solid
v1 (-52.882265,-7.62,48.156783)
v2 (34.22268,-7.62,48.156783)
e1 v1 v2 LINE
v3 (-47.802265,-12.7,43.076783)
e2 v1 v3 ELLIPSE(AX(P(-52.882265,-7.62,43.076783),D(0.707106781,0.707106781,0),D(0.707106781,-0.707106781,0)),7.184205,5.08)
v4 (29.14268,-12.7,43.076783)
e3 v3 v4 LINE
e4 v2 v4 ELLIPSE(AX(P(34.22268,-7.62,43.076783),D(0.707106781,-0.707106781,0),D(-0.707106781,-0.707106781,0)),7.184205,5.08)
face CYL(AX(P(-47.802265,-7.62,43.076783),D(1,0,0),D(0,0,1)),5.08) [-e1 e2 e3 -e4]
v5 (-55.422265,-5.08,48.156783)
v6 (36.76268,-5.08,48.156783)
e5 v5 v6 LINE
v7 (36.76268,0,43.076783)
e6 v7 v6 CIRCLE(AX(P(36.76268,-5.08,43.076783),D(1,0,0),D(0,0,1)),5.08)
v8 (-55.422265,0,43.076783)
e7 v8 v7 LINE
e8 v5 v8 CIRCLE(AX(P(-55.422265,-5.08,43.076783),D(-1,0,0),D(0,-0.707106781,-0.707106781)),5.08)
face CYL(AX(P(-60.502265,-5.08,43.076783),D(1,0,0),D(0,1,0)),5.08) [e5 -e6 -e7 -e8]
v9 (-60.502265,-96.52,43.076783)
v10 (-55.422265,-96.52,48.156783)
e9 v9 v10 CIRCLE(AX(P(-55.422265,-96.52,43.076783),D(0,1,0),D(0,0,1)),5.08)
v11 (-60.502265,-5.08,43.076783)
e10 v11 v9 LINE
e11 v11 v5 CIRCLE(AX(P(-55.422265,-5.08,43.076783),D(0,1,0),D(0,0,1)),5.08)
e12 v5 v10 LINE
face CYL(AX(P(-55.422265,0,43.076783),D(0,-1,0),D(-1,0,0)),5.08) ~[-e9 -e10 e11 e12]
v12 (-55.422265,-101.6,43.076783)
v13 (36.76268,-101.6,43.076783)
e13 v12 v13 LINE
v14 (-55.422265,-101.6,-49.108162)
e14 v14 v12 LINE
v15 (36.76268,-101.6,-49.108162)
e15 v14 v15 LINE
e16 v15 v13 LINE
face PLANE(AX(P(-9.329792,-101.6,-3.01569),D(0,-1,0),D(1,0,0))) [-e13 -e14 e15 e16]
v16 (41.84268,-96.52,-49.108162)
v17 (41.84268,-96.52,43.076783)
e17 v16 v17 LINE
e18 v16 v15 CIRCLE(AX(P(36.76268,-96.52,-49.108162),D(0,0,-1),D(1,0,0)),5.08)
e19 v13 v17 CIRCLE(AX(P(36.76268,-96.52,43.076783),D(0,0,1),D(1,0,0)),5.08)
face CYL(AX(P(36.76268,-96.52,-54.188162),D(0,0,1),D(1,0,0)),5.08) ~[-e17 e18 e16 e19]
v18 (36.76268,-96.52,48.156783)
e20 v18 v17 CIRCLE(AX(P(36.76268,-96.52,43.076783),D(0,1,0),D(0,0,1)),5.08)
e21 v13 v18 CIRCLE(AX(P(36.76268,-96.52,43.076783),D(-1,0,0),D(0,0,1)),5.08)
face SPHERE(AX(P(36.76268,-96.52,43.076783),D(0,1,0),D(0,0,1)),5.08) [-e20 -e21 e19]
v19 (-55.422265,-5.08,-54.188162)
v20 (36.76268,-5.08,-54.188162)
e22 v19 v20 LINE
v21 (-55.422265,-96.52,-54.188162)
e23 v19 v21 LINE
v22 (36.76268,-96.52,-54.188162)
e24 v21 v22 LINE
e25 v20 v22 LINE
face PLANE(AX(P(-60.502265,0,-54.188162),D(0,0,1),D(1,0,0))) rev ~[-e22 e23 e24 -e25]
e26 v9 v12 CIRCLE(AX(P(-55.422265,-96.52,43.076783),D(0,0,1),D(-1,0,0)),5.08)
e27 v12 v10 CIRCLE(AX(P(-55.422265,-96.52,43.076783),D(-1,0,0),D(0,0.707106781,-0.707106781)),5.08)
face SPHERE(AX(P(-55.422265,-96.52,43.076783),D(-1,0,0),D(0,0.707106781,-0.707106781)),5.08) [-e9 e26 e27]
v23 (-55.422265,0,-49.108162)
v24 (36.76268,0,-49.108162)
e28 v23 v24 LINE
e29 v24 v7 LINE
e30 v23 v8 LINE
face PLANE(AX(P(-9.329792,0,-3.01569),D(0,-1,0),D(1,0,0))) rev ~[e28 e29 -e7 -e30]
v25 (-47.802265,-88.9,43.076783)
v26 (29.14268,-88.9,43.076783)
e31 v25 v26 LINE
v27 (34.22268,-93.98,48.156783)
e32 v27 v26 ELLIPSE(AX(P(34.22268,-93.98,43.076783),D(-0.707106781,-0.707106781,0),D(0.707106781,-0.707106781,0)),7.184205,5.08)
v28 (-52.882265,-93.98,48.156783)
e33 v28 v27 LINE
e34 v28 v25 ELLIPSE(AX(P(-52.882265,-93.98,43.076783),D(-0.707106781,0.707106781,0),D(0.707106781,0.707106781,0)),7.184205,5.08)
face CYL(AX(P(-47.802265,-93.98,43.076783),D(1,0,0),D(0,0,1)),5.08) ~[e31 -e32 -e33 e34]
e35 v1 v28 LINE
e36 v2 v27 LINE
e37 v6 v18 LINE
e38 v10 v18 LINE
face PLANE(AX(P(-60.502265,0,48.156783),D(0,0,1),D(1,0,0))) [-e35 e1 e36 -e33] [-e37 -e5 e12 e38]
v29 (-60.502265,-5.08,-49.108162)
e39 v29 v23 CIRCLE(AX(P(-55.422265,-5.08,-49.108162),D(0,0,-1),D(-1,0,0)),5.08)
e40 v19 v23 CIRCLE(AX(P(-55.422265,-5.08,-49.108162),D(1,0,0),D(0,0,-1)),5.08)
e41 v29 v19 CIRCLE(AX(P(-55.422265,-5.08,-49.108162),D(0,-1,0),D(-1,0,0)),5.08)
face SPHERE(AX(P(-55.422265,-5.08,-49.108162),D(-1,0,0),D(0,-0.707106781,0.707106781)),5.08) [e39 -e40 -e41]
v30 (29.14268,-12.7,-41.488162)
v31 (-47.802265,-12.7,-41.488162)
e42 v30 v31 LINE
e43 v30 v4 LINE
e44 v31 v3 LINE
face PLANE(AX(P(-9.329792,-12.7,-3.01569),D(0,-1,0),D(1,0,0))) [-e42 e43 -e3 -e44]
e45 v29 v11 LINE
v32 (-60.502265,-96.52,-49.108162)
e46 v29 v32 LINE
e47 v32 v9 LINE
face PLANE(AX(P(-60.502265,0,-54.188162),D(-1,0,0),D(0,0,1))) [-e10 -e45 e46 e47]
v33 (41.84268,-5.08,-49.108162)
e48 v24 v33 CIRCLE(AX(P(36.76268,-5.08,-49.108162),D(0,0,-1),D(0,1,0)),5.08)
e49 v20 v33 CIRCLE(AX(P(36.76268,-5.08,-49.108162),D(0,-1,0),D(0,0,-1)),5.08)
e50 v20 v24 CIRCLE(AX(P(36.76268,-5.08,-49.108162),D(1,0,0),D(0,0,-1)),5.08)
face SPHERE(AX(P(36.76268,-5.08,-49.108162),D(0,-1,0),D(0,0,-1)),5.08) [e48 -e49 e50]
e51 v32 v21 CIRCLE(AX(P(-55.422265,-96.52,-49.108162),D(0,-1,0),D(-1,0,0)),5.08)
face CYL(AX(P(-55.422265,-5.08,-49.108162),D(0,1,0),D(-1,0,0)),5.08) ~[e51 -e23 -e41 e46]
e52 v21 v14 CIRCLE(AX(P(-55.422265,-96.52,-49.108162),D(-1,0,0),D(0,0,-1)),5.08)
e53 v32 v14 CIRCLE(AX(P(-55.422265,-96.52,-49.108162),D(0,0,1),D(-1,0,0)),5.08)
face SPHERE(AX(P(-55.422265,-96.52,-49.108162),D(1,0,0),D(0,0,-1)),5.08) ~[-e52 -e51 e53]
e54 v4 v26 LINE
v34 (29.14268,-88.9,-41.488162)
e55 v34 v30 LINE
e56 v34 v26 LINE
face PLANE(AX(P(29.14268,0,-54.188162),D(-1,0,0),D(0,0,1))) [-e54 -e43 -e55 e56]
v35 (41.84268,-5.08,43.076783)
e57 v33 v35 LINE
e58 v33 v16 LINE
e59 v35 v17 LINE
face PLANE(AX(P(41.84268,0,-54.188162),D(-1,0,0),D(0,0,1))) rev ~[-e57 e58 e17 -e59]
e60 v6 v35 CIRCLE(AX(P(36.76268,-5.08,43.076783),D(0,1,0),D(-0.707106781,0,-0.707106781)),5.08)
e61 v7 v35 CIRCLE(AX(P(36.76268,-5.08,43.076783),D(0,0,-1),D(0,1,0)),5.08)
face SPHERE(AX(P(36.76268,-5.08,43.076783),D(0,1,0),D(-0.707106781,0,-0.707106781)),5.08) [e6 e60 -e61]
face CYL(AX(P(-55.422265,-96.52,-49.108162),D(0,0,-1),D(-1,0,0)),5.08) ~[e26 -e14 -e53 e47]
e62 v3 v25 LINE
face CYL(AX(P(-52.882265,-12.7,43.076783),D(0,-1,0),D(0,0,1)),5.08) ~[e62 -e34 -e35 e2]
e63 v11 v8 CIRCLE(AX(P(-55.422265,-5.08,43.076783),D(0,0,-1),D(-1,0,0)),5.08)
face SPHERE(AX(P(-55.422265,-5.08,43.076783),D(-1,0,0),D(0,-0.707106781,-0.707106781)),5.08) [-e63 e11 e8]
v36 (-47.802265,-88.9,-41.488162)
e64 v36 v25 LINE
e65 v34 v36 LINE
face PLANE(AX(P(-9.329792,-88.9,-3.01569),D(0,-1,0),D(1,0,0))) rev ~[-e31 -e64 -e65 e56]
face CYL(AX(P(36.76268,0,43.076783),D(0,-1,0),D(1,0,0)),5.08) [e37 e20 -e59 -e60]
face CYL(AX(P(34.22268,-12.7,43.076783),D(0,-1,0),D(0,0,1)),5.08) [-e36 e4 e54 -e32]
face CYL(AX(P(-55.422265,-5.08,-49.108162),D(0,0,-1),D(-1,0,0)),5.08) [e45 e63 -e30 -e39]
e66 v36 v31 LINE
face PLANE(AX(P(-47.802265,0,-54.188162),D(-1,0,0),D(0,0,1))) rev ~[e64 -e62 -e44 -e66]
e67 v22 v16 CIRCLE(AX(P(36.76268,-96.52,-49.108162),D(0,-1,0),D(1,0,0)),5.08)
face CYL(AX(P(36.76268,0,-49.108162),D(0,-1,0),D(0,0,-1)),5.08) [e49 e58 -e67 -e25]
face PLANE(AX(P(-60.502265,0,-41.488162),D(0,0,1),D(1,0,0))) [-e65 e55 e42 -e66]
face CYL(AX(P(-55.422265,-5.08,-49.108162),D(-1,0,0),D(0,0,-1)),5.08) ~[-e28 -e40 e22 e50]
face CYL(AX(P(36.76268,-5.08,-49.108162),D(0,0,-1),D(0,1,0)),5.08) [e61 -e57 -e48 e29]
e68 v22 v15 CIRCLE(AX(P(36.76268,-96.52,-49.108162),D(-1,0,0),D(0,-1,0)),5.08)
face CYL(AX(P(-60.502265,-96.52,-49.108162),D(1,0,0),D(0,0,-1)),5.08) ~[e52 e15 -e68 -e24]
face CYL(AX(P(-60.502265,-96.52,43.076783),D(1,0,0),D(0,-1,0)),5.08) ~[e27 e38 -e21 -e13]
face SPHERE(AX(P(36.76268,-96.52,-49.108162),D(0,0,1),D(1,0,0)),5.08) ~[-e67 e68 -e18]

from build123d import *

# Parameters (mm, degrees)
F0_W         = 102.3449450731
F0_H         = 102.3449450731
F1_DEPTH     = 101.6
F2_T         = -12.7
F3_R         = 5.08
F4_T1_DEPTH  = 92.1849450731
F4_T3_DEPTH  = 92.1849450731
F4_T5_DEPTH  = 91.44
F4_S9_W      = 5.08
F4_S9_H      = 5.08
F4_T10_DEPTH = 5.08
F4_S15_W     = 5.08
F4_S15_H     = 5.08
F4_T16_DEPTH = 5.08
F4_S21_W     = 5.08
F4_S21_H     = 5.08
F4_T22_DEPTH = 5.08
F4_S27_W     = 5.08
F4_S27_H     = 5.08
F4_T28_DEPTH = 5.08
F4_T32_ANGLE = 90
F4_T34_ANGLE = 90


# Not quite as in the source:
# - a fillet or chamfer that OpenCascade refuses, or shapes differently, is made with other operations: its cross-section is extruded or revolved along the edge and cut away or added


with BuildPart() as f1:
    # F0 (on Front) → F1 (new body)
    with BuildSketch(Plane.XZ):
        with Locations((-9.3297921121, -3.0156895518)):
            Rectangle(F0_W, F0_H)
    extrude(amount=F1_DEPTH)

    # F2
    f2_openings = [f1.faces().sort_by_distance(p)[0] for p in [
        (-9.329792, -50.8, 48.156783),
    ]]
    offset(amount=F2_T, openings=f2_openings)

    # F3
    f3_edges = [f1.edges().sort_by_distance(p)[0] for p in [
        (41.84268, -50.8, 48.156783),
        (-9.329792, -101.6, 48.156783),
        (41.84268, -101.6, -3.01569),
        (41.84268, -50.8, -54.188162),
        (-9.329792, -101.6, -54.188162),
        (-9.329792, -88.9, 48.156783),
        (-60.502265, -50.8, 48.156783),
        (-9.329792, 0, 48.156783),
        (29.14268, -50.8, 48.156783),
        (-9.329792, -12.7, 48.156783),
        (-47.802265, -50.8, 48.156783),
    ]]
    fillet(f3_edges, radius=F3_R)

    # F4: fillet of radius 5.08 on 3 edges, made by hand

    # F4_s2 → F4_t1 (cut)
    with BuildSketch(Plane.YZ.offset(-55.4222646487)):
        with BuildLine():
            ThreePointArc((-5.08, -54.1881620884), (-1.4878975516, -52.7002645368), (0, -49.1081620884))
            Line((0, -49.1081620884), (0, -54.1881620884))
            Line((0, -54.1881620884), (-5.08, -54.1881620884))
        make_face()
    extrude(amount=F4_T1_DEPTH, mode=Mode.SUBTRACT)

    # F4_s4 → F4_t3 (cut)
    with BuildSketch(Plane.XY.offset(-49.1081620884)):
        with BuildLine():
            ThreePointArc((-60.5022646487, -5.08), (-59.0143670971, -1.4878975516), (-55.4222646487, 0))
            Line((-55.4222646487, 0), (-60.5022646487, 0))
            Line((-60.5022646487, 0), (-60.5022646487, -5.08))
        make_face()
        with BuildLine():
            ThreePointArc((-60.5022646487, -96.52), (-59.0143670971, -100.1121024484), (-55.4222646487, -101.6))
            Line((-55.4222646487, -101.6), (-60.5022646487, -101.6))
            Line((-60.5022646487, -101.6), (-60.5022646487, -96.52))
        make_face()
        with BuildLine():
            ThreePointArc((36.7626804245, 0), (40.3547828729, -1.4878975516), (41.8426804245, -5.08))
            Line((41.8426804245, -5.08), (41.8426804245, 0))
            Line((41.8426804245, 0), (36.7626804245, 0))
        make_face()
    extrude(amount=F4_T3_DEPTH, mode=Mode.SUBTRACT)

    # F4_s6 → F4_t5 (cut)
    with BuildSketch(Plane.XZ.offset(5.08)):
        with BuildLine():
            ThreePointArc((-60.5022646487, -49.1081620884), (-59.0143670971, -52.7002645368), (-55.4222646487, -54.1881620884))
            Line((-55.4222646487, -54.1881620884), (-60.5022646487, -54.1881620884))
            Line((-60.5022646487, -54.1881620884), (-60.5022646487, -49.1081620884))
        make_face()
    extrude(amount=F4_T5_DEPTH, mode=Mode.SUBTRACT)


with BuildPart() as f4_tool8:
    # F4_s9 → F4_t10 (new body)
    with BuildSketch(Plane.YZ.offset(-55.4222646487)):
        with Locations((-99.06, 45.6167829847)):
            Rectangle(F4_S9_W, F4_S9_H)
    extrude(amount=-F4_T10_DEPTH)

    # F4_s11 → F4_t12 (revolve, cut)
    with BuildSketch(Plane(origin=(-55.4222646487, -96.52, 43.0767829847), x_dir=(0, 0.7071067812, -0.7071067812), z_dir=(0, 0.7071067812, 0.7071067812))):
        with BuildLine():
            ThreePointArc((0, -5.08), (5.08, 0), (0, 5.08))
            Line((0, 5.08), (0, -5.08))
        make_face()
    revolve(axis=Axis((-55.4222646487, -96.52, 43.0767829847), (-1, 0, 0)), mode=Mode.SUBTRACT)


with BuildPart() as f1_1:
    add(f1.part)

    # F4_t7: cut F4_tool8
    add(f4_tool8.part, mode=Mode.SUBTRACT)


with BuildPart() as f4_tool14:
    # F4_s15 → F4_t16 (new body)
    with BuildSketch(Plane.YZ.offset(-55.4222646487)):
        with Locations((-2.54, 45.6167829847)):
            Rectangle(F4_S15_W, F4_S15_H)
    extrude(amount=-F4_T16_DEPTH)

    # F4_s17 → F4_t18 (revolve, cut)
    with BuildSketch(Plane(origin=(-55.4222646487, -5.08, 43.0767829847), x_dir=(0, -0.7071067812, -0.7071067812), z_dir=(0, 0.7071067812, -0.7071067812))):
        with BuildLine():
            ThreePointArc((0, -5.08), (5.08, 0), (0, 5.08))
            Line((0, 5.08), (0, -5.08))
        make_face()
    revolve(axis=Axis((-55.4222646487, -5.08, 43.0767829847), (-1, 0, 0)), mode=Mode.SUBTRACT)


with BuildPart() as f1_2:
    add(f1_1.part)

    # F4_t13: cut F4_tool14
    add(f4_tool14.part, mode=Mode.SUBTRACT)


with BuildPart() as f4_tool20:
    # F4_s21 → F4_t22 (new body)
    with BuildSketch(Plane.XZ.offset(5.08)):
        with Locations((39.3026804245, 45.6167829847)):
            Rectangle(F4_S21_W, F4_S21_H)
    extrude(amount=-F4_T22_DEPTH)

    # F4_s23 → F4_t24 (revolve, cut)
    with BuildSketch(Plane(origin=(36.7626804245, -5.08, 43.0767829847), x_dir=(-0.7071067812, 0, -0.7071067812), z_dir=(0.7071067812, 0, -0.7071067812))):
        with BuildLine():
            ThreePointArc((0, -5.08), (5.08, 0), (0, 5.08))
            Line((0, 5.08), (0, -5.08))
        make_face()
    revolve(axis=Axis((36.7626804245, -5.08, 43.0767829847), (0, 1, 0)), mode=Mode.SUBTRACT)


with BuildPart() as f1_3:
    add(f1_2.part)

    # F4_t19: cut F4_tool20
    add(f4_tool20.part, mode=Mode.SUBTRACT)


with BuildPart() as f4_tool26:
    # F4_s27 → F4_t28 (new body)
    with BuildSketch(Plane.YZ.offset(-55.4222646487)):
        with Locations((-2.54, -51.6481620884)):
            Rectangle(F4_S27_W, F4_S27_H)
    extrude(amount=-F4_T28_DEPTH)

    # F4_s29 → F4_t30 (revolve, cut)
    with BuildSketch(Plane(origin=(-55.4222646487, -5.08, -49.1081620884), x_dir=(0, -0.7071067812, 0.7071067812), z_dir=(0, -0.7071067812, -0.7071067812))):
        with BuildLine():
            ThreePointArc((0, -5.08), (5.08, 0), (0, 5.08))
            Line((0, 5.08), (0, -5.08))
        make_face()
    revolve(axis=Axis((-55.4222646487, -5.08, -49.1081620884), (-1, 0, 0)), mode=Mode.SUBTRACT)


with BuildPart() as f1_4:
    add(f1_3.part)

    # F4_t25: cut F4_tool26
    add(f4_tool26.part, mode=Mode.SUBTRACT)

    # F4_s31 → F4_t32 (revolve, cut)
    with BuildSketch(Plane.XZ.offset(96.52)):
        with BuildLine():
            ThreePointArc((-60.5022646487, -49.1081620884), (-59.0143670971, -52.7002645368), (-55.4222646487, -54.1881620884))
            Line((-55.4222646487, -54.1881620884), (-60.5022646487, -54.1881620884))
            Line((-60.5022646487, -54.1881620884), (-60.5022646487, -49.1081620884))
        make_face()
    revolve(axis=Axis((-60.5022646487, -96.52, -49.1081620884), (-1, 0, 0)), revolution_arc=F4_T32_ANGLE, mode=Mode.SUBTRACT)

    # F4_s33 → F4_t34 (revolve, cut)
    with BuildSketch(Plane.YZ.offset(36.7626804245)):
        with BuildLine():
            ThreePointArc((0, -49.1081620884), (-1.4878975516, -52.7002645368), (-5.08, -54.1881620884))
            Line((-5.08, -54.1881620884), (0, -54.1881620884))
            Line((0, -54.1881620884), (0, -49.1081620884))
        make_face()
    revolve(axis=Axis((36.7626804245, 0, -49.1081620884), (0, -1, 0)), revolution_arc=F4_T34_ANGLE, mode=Mode.SUBTRACT)


solid = f1_4.part
